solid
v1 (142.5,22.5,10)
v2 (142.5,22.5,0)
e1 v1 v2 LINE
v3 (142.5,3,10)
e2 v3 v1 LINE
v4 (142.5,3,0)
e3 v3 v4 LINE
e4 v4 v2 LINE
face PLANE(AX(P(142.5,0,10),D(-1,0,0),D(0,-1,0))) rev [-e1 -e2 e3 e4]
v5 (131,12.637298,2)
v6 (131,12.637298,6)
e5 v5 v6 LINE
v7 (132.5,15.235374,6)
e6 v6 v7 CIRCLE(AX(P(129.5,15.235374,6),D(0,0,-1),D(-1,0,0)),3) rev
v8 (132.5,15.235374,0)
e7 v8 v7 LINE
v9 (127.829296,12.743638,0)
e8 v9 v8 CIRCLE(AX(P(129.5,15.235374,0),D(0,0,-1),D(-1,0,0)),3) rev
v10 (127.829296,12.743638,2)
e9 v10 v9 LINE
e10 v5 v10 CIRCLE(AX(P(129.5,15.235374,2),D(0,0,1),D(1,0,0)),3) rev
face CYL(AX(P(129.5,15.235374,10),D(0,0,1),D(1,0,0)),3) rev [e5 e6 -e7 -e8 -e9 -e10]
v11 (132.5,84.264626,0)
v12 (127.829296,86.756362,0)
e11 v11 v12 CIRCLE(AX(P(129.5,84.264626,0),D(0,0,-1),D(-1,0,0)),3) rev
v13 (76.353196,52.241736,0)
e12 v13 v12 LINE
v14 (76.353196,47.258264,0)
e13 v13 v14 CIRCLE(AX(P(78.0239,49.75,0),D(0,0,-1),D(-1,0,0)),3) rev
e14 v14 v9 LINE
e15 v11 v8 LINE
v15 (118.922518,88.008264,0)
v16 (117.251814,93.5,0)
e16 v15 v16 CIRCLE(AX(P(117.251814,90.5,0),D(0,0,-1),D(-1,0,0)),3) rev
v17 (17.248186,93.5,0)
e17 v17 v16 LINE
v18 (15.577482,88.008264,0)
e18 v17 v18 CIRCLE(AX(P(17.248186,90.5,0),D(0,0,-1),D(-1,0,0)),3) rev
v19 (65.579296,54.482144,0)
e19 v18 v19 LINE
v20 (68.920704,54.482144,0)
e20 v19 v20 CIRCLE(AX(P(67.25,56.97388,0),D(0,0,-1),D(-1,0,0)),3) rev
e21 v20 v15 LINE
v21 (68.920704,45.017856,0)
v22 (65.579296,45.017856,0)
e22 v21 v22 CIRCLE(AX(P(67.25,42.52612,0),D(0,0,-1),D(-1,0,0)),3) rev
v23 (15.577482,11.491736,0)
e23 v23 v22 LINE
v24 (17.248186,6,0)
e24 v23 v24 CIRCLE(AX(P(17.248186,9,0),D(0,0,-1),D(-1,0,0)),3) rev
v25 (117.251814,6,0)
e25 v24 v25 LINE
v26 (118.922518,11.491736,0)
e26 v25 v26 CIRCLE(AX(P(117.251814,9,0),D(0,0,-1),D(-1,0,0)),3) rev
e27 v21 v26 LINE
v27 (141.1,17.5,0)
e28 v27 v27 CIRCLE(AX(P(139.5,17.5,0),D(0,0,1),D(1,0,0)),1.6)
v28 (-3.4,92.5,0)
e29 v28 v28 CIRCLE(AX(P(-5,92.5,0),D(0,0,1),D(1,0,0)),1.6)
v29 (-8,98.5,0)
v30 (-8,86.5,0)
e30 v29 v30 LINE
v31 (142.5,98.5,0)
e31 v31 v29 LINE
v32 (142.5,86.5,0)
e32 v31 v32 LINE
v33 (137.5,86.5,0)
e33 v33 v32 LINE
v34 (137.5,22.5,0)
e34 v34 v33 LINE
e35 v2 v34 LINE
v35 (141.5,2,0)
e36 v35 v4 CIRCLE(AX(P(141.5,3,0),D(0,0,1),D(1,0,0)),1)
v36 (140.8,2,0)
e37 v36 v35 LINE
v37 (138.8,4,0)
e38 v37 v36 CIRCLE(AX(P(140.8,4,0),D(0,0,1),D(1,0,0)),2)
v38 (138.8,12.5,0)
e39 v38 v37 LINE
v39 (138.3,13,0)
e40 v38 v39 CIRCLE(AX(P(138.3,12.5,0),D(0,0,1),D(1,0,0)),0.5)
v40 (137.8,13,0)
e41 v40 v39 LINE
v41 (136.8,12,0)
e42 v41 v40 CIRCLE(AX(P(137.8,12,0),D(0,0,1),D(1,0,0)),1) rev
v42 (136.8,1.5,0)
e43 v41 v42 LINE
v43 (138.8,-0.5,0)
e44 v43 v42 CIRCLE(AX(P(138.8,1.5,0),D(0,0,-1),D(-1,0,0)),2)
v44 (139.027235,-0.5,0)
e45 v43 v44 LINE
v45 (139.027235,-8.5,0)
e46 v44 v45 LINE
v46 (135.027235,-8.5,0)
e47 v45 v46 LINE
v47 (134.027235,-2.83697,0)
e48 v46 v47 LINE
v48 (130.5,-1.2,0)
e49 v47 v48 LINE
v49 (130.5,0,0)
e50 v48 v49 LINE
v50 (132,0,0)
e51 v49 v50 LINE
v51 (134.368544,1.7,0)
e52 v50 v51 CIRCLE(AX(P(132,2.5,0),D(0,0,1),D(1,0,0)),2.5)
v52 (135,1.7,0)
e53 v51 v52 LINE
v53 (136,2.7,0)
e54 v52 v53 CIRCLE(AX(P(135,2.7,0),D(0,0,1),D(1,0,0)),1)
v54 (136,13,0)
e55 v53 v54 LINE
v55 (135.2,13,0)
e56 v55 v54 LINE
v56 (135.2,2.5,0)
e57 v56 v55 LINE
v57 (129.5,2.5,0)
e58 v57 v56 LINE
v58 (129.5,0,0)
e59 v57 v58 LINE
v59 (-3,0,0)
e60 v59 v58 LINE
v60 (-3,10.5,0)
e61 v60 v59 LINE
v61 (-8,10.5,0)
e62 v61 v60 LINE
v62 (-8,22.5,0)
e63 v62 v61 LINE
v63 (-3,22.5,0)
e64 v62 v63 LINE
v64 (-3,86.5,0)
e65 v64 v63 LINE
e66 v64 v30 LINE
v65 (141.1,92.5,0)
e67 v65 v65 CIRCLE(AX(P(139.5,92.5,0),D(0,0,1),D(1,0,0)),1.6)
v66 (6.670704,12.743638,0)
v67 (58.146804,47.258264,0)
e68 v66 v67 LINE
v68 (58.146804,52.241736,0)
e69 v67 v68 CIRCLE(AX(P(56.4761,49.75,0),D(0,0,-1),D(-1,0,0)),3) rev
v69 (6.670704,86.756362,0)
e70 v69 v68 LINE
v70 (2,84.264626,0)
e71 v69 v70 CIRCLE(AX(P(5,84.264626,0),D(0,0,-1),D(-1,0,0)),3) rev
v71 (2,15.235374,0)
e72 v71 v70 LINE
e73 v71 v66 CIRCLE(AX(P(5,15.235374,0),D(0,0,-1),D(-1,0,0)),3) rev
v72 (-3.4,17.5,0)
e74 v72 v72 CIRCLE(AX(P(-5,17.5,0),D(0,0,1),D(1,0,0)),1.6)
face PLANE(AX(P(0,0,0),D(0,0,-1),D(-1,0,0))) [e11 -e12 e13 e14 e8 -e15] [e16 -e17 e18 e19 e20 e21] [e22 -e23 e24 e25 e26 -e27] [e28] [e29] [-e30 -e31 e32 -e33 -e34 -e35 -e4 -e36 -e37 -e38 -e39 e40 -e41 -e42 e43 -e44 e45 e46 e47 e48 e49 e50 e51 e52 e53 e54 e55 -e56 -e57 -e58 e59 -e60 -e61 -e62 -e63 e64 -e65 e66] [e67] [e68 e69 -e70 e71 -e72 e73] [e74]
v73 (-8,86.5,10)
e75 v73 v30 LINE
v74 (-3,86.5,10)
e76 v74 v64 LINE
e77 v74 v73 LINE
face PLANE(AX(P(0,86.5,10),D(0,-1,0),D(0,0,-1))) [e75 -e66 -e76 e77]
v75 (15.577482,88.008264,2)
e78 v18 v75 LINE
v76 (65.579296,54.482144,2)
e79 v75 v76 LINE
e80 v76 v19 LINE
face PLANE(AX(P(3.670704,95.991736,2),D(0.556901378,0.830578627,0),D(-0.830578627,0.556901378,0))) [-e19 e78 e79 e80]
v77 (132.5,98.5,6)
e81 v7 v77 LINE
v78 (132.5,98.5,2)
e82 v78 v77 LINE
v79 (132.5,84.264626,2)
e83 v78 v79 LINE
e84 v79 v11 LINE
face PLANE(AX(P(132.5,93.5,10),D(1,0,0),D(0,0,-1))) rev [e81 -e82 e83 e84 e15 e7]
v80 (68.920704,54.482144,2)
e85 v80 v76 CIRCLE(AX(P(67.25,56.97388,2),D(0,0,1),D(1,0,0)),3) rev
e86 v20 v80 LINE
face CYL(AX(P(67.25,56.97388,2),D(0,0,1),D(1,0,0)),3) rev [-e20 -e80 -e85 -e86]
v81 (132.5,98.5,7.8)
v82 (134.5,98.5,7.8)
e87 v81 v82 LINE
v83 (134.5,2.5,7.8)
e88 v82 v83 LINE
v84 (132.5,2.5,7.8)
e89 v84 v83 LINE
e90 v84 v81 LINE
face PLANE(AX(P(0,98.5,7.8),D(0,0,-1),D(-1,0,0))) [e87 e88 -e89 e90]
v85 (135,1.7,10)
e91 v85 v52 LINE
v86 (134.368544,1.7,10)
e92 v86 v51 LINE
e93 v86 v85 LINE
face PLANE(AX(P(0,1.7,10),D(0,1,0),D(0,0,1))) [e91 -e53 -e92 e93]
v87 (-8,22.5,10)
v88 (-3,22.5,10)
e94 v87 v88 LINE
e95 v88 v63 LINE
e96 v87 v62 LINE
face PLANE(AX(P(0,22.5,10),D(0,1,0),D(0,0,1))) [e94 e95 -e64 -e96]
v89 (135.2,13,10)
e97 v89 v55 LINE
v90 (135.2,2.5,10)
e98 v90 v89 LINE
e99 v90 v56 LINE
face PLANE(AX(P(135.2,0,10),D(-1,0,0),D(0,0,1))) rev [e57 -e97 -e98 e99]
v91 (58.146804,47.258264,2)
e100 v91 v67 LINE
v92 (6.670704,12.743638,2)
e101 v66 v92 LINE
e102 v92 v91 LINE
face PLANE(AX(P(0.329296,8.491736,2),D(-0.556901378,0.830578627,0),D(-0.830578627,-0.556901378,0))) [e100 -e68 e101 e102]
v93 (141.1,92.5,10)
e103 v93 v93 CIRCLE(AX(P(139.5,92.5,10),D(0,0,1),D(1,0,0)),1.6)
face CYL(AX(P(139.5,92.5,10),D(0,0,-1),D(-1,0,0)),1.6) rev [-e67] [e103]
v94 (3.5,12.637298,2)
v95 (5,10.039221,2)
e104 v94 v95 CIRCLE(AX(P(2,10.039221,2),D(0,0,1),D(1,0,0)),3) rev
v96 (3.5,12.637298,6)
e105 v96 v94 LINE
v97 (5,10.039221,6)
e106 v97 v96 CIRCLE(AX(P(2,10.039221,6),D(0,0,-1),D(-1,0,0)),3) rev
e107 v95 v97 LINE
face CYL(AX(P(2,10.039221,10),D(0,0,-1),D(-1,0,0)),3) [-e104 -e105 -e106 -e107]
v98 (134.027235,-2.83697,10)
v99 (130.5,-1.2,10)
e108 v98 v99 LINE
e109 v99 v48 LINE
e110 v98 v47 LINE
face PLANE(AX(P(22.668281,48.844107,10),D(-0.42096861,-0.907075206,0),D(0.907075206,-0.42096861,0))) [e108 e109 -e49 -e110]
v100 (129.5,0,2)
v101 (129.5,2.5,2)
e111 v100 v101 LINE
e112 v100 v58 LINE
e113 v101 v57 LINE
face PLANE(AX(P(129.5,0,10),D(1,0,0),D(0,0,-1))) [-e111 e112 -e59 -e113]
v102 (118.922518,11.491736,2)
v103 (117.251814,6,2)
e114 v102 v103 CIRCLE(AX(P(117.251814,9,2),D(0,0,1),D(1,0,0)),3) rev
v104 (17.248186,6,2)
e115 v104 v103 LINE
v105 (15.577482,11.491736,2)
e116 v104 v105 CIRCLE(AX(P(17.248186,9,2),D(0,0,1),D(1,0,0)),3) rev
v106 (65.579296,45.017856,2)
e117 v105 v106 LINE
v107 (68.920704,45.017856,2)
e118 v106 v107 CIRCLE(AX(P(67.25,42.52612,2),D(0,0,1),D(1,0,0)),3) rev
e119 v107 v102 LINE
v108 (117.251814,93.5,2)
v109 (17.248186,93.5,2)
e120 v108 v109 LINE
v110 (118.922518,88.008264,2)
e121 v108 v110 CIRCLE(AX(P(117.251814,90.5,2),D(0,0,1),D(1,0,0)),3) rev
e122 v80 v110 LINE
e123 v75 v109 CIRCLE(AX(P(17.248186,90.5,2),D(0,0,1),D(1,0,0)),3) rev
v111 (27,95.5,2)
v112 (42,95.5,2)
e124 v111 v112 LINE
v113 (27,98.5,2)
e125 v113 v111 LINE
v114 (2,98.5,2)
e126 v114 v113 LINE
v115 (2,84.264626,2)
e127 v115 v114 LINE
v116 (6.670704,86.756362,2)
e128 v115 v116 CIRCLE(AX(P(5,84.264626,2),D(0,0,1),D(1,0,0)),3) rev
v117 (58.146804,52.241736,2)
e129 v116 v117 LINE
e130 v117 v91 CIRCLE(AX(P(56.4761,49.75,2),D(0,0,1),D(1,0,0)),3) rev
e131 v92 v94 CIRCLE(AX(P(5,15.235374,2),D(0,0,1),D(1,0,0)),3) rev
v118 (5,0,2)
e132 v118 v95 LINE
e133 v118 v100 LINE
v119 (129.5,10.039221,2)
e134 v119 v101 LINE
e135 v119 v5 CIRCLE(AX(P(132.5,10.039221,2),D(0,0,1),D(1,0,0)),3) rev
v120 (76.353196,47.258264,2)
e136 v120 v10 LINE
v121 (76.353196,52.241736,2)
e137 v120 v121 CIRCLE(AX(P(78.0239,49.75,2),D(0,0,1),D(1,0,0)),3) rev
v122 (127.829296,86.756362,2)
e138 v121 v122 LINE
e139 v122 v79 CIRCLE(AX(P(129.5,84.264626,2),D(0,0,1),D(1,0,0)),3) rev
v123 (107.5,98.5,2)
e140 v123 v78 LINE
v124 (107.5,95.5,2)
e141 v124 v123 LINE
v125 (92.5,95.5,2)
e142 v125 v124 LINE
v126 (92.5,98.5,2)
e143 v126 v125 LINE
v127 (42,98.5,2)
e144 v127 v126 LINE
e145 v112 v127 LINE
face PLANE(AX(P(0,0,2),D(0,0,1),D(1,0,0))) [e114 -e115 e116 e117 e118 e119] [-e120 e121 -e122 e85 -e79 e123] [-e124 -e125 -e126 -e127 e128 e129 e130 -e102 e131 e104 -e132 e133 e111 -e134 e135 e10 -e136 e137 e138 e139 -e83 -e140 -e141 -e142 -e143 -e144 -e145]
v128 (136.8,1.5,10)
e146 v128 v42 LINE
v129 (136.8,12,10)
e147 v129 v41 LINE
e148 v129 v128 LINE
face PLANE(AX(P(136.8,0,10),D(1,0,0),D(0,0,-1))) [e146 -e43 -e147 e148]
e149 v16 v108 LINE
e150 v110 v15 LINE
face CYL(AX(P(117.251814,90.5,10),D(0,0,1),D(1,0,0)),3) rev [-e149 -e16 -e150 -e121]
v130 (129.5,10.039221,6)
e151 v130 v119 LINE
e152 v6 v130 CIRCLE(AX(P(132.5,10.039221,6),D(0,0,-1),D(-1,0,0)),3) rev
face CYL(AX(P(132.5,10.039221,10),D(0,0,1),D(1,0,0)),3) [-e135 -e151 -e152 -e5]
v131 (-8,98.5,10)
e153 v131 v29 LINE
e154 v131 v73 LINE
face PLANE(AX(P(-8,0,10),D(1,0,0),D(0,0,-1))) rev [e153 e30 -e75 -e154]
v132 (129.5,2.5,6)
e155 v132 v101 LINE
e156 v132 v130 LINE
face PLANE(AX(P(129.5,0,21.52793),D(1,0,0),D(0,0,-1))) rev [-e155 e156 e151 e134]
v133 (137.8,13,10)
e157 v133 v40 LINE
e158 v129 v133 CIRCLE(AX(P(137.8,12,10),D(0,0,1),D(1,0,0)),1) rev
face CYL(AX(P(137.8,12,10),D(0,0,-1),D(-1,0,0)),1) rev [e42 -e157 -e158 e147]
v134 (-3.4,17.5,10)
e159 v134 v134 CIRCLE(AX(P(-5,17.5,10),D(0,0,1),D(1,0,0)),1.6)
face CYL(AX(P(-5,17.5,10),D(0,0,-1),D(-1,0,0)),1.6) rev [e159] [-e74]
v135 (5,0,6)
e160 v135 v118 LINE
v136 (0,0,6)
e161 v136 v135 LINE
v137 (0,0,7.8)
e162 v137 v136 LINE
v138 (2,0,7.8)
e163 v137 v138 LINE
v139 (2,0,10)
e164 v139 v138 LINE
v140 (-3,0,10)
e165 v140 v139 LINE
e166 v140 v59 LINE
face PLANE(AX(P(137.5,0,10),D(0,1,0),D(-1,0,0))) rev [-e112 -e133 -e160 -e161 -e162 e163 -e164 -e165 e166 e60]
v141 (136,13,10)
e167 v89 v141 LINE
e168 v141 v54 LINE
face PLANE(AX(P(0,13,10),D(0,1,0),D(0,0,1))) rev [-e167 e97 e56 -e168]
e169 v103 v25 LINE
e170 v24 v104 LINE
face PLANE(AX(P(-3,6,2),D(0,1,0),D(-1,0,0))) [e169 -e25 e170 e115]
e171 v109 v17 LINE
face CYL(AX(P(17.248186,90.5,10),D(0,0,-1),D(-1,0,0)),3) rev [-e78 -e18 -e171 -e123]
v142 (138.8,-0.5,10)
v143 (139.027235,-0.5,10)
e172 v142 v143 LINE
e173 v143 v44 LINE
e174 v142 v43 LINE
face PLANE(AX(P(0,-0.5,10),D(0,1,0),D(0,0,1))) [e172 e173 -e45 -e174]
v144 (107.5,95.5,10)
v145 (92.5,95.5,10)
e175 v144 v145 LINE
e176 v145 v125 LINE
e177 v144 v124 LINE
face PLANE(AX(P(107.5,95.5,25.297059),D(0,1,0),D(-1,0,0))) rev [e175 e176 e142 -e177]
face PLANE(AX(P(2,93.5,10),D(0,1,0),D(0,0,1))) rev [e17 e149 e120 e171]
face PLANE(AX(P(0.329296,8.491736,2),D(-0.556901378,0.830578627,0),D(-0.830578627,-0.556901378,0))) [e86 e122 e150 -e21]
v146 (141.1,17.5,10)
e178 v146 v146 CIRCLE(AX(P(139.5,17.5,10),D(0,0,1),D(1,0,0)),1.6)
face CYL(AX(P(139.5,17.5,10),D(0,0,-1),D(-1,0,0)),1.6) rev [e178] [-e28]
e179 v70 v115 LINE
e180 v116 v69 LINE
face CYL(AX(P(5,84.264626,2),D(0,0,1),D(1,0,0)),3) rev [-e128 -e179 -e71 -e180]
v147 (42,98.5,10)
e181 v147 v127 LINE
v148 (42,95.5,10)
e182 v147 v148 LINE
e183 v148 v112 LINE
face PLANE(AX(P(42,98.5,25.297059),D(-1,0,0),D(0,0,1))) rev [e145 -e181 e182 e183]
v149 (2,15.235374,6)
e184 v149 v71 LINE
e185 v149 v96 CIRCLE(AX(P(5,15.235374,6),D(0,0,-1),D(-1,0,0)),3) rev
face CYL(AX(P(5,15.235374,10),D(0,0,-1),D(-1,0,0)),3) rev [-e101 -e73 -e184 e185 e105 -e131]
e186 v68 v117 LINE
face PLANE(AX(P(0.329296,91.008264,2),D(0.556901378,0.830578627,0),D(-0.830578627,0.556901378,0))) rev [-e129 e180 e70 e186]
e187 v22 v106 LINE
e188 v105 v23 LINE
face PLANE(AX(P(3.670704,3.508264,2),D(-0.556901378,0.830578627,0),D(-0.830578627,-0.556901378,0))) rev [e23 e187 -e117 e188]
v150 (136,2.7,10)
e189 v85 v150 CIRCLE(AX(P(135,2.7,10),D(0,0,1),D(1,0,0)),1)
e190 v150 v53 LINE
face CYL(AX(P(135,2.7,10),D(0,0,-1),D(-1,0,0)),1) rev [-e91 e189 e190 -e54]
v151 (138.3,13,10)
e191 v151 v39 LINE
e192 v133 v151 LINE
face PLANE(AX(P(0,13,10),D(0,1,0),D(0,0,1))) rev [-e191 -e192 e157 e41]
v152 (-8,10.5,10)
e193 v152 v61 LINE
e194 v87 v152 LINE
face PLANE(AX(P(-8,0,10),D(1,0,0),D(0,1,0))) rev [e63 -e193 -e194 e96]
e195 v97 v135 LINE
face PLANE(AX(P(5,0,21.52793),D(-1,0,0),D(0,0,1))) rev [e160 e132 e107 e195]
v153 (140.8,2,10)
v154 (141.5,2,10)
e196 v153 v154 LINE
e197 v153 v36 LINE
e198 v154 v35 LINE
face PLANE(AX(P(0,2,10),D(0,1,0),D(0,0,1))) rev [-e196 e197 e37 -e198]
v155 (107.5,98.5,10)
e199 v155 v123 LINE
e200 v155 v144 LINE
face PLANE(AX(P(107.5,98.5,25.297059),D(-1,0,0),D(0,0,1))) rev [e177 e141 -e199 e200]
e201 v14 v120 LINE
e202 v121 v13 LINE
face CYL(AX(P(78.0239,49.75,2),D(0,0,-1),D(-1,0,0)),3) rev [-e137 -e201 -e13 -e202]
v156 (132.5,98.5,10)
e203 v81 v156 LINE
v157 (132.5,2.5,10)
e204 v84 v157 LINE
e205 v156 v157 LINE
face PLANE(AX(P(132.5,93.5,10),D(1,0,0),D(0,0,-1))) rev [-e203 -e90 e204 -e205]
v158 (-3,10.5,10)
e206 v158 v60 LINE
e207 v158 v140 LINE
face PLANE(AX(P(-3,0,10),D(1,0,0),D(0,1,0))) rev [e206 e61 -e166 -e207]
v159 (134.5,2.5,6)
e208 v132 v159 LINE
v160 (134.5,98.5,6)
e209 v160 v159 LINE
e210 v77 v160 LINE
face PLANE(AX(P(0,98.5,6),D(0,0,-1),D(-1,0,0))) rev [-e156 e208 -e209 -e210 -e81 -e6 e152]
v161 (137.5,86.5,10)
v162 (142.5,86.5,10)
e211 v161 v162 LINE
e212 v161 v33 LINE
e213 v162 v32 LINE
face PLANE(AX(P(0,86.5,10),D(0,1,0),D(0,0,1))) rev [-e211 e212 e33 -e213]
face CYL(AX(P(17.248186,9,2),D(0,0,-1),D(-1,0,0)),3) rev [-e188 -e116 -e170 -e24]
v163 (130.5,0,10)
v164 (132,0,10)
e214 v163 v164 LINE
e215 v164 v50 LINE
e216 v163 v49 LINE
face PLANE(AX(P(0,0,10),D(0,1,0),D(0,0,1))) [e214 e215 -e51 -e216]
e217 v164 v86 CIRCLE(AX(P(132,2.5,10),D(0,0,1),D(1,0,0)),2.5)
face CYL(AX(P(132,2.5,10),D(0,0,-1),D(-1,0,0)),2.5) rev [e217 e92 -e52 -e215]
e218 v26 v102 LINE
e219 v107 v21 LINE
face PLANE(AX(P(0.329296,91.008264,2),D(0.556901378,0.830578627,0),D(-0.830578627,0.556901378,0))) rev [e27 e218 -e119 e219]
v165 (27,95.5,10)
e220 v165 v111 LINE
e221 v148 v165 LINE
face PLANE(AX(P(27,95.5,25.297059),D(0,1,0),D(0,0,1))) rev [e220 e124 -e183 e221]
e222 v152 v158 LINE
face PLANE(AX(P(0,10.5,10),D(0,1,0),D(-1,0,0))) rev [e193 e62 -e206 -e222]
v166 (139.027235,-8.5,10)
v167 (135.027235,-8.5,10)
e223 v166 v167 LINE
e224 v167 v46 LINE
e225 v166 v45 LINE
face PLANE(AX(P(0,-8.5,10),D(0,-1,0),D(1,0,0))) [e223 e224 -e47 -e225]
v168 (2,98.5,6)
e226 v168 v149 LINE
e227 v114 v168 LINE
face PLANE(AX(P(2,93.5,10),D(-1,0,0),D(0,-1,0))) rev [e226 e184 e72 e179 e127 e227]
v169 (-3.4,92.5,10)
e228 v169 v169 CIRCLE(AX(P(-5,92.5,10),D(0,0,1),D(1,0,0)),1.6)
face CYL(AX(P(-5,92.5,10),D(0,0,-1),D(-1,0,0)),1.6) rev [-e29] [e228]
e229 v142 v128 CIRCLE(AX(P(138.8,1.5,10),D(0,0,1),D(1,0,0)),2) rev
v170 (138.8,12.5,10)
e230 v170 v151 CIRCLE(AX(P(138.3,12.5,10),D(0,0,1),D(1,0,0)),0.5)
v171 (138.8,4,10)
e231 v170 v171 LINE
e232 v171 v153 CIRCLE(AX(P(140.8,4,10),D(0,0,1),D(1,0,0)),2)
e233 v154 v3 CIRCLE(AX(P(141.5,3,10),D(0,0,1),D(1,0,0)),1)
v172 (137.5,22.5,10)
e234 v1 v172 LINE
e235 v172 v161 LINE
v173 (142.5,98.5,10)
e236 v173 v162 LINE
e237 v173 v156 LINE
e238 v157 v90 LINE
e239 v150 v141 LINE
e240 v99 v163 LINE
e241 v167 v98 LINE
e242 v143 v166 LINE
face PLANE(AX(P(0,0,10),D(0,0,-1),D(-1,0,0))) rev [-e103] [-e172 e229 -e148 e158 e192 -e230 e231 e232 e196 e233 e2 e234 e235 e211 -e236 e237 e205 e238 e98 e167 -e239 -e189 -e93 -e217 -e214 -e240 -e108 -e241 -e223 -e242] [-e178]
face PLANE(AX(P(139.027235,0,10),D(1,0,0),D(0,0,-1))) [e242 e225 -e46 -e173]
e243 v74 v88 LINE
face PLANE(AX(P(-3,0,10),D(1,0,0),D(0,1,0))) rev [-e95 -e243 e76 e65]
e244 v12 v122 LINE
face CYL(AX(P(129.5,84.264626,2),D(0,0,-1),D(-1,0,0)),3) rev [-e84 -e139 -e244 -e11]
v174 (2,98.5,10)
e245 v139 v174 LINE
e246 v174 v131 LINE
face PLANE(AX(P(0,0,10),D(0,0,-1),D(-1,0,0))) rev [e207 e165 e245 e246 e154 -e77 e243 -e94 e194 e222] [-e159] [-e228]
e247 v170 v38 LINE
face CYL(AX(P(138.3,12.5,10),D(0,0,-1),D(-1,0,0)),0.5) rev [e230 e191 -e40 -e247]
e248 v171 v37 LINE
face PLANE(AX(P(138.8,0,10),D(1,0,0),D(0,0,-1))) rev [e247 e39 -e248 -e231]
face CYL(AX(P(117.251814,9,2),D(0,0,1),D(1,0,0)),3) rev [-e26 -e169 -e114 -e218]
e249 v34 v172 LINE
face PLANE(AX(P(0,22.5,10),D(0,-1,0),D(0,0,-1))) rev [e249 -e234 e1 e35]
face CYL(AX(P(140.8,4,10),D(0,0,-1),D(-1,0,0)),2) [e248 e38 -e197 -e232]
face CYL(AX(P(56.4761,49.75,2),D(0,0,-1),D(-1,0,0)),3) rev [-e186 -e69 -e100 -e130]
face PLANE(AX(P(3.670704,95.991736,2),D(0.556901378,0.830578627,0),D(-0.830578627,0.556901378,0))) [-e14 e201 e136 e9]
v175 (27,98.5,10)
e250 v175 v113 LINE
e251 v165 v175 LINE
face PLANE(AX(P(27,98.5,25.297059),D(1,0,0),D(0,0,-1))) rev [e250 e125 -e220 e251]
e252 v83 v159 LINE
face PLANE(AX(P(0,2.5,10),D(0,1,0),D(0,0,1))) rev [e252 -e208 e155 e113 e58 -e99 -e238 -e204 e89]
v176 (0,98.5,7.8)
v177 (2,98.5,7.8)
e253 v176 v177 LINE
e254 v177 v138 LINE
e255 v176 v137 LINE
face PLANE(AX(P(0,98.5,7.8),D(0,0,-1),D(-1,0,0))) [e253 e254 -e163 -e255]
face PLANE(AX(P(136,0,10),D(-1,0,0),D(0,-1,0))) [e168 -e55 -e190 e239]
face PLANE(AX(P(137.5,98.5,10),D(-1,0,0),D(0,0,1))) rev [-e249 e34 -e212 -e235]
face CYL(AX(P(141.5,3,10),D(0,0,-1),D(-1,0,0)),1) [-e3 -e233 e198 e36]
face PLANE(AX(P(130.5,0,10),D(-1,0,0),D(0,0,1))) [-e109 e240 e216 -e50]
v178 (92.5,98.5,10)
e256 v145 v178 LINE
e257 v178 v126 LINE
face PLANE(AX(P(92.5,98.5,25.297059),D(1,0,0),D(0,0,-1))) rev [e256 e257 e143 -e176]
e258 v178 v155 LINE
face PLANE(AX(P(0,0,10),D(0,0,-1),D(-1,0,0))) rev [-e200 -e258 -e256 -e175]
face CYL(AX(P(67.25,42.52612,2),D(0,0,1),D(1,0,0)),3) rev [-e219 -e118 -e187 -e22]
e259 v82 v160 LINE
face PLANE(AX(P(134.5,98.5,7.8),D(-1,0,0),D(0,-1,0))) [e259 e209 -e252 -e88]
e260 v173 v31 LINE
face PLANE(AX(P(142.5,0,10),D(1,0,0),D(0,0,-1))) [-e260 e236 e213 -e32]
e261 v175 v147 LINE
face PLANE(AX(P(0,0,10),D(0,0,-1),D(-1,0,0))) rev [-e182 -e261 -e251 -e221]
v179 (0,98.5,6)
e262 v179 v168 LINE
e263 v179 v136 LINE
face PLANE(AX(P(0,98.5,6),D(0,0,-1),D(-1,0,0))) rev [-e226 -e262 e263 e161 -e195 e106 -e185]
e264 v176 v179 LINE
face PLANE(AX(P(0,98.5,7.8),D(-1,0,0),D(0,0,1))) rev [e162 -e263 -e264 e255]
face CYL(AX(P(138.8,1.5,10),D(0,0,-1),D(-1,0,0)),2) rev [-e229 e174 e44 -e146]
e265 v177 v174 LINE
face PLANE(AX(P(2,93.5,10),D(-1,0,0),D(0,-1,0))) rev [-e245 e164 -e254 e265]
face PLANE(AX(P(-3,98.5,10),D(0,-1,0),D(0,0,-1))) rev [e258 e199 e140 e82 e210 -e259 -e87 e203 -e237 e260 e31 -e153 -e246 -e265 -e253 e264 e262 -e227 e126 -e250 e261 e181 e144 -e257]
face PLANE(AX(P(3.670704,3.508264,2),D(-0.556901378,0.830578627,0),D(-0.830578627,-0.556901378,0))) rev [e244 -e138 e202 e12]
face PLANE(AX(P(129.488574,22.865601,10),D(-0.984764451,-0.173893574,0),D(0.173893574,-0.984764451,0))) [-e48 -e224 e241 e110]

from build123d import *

# Parameters (mm, degrees)
BOSS_EXTRUDE1_DEPTH     = 10
SKETCH3_W               = 134.5
SKETCH3_H               = 1.8
CUT_EXTRUDE1_DEPTH      = 170.435828561
SKETCH5_W               = 140.5
SKETCH5_H               = 6
BOSS_EXTRUDE3_DEPTH     = 2
CUT_EXTRUDE2_DEPTH      = 170.435828561
FILLET1_R               = 3
BOSS_EXTRUDE2_OUTLINE_W = 5
BOSS_EXTRUDE2_OUTLINE_H = 12
BOSS_EXTRUDE2_OUTLINE_R = 1.6
BOSS_EXTRUDE2_DEPTH     = 10
SKETCH7_W               = 130.5
SKETCH7_H               = 5
CUT_EXTRUDE3_DEPTH      = 8
SKETCH8_W               = 15
SKETCH8_H               = 3
BOSS_EXTRUDE4_DEPTH     = 8
BOSS_EXTRUDE5_DEPTH     = 4
FILLET2_R               = 3


# Read off the part's stored shape, not the designer's step: Boss-Extrude2
with BuildPart() as part:
    # Sketch2 → Boss-Extrude1 (new body)
    with BuildSketch(Plane.XY):
        Polygon((2, 0), (-3, 0), (-3, 98.5), (137.5, 98.5), (137.5, 0), (132.5, 0), (132.5, 93.5), (2, 93.5), align=None)
    extrude(amount=BOSS_EXTRUDE1_DEPTH)

    # Sketch3 → Cut-Extrude1 (cut, through all)
    with BuildSketch(Plane.XZ):
        with Locations((67.25, 6.9)):
            Rectangle(SKETCH3_W, SKETCH3_H)
    extrude(amount=-CUT_EXTRUDE1_DEPTH, mode=Mode.SUBTRACT)

    # Sketch5 → Boss-Extrude3 (add)
    with BuildSketch(Plane(origin=(0, 0, 0), x_dir=(-1, 0, 0), z_dir=(0, 0, -1))):
        with Locations((-67.25, 3)):
            Rectangle(SKETCH5_W, SKETCH5_H)
        Polygon((-0.329295866, 8.49173588), (-130.829295866, 95.99173588), (-134.170704134, 91.00826412), (-3.670704134, 3.50826412), align=None)
        Polygon((-3.670704134, 95.99173588), (-134.170704134, 8.49173588), (-130.829295866, 3.50826412), (-0.329295866, 91.00826412), align=None)
    extrude(amount=-BOSS_EXTRUDE3_DEPTH)

    # Sketch4 → Cut-Extrude2 (cut, through all)
    with BuildSketch(Plane.XY):
        with BuildLine():
            ThreePointArc((132, 0), (133.457737974, 0.468990399), (134.368543856, 1.7))
            Line((134.368543856, 1.7), (135, 1.7))
            ThreePointArc((135, 1.7), (135.707106781, 1.992893219), (136, 2.7))
            Line((136, 2.7), (136, 13))
            Line((136, 13), (135.2, 13))
            Line((135.2, 13), (135.2, 2.5))
            Line((135.2, 2.5), (129.5, 2.5))
            Line((129.5, 2.5), (129.5, 0))
            Line((129.5, 0), (130.5, 0))
            Line((130.5, 0), (132, 0))
        make_face()
        with BuildLine():
            ThreePointArc((141.5, 2), (142.207106781, 2.292893219), (142.5, 3))
            Line((142.5, 3), (142.5, -0.5))
            Line((142.5, -0.5), (139.0272352, -0.5))
            Line((139.0272352, -0.5), (138.8, -0.5))
            ThreePointArc((138.8, -0.5), (137.385786438, 0.085786438), (136.8, 1.5))
            Line((136.8, 1.5), (136.8, 12))
            ThreePointArc((136.8, 12), (137.092893219, 12.707106781), (137.8, 13))
            Line((137.8, 13), (138.3, 13))
            ThreePointArc((138.3, 13), (138.653553391, 12.853553391), (138.8, 12.5))
            Line((138.8, 12.5), (138.8, 4))
            ThreePointArc((138.8, 4), (139.385786438, 2.585786438), (140.8, 2))
            Line((140.8, 2), (141.5, 2))
        make_face()
    extrude(amount=CUT_EXTRUDE2_DEPTH, mode=Mode.SUBTRACT)

    # Fillet1
    fillet1_edges = [part.edges().sort_by_distance(p)[0] for p in [
        (132.5, 89.888060199, 1),
        (72.636950218, 49.75, 1),
        (61.863049782, 49.75, 1),
        (67.25, 53.361939801, 1),
        (2, 89.888060199, 1),
        (127.113049782, 93.5, 1),
        (7.386950218, 6, 1),
        (2, 9.611939801, 1),
        (132.5, 9.611939801, 1),
        (67.25, 46.138060199, 1),
        (127.113049782, 6, 1),
        (7.386950218, 93.5, 1),
    ]]
    fillet(fillet1_edges, radius=FILLET1_R)

    # Boss-Extrude2 outline → Boss-Extrude2 (add)
    # profile 1 of 5: a face of its own
    with BuildSketch(Plane.XY):
        with BuildLine():
            Line((134.5, 1.7), (134.368543856, 1.7))
            ThreePointArc((134.368543856, 1.7), (133.457737974, 0.468990399), (132, 0))
            Line((132, 0), (130.5, 0))
            Line((130.5, 0), (130.5, -1.2))
            Line((130.5, -1.2), (134.0272352, -2.83697044))
            Line((134.0272352, -2.83697044), (135.0272352, -8.5))
            Line((135.0272352, -8.5), (139.0272352, -8.5))
            Line((139.0272352, -8.5), (139.0272352, -0.5))
            Line((139.0272352, -0.5), (138.8, -0.5))
            ThreePointArc((138.8, -0.5), (138.092893219, -0.370828693), (137.477124345, 1e-09))
            Line((137.477124345, 1e-09), (134.5, 0))
            Line((134.5, 0), (134.5, 1.7))
        make_face()
    # profile 2 of 5: a face of its own
    with BuildSketch(Plane.XY):
        with Locations((-5.5, 16.5)):
            Rectangle(BOSS_EXTRUDE2_OUTLINE_W, BOSS_EXTRUDE2_OUTLINE_H)
        with Locations((-5, 17.5)):
            Circle(BOSS_EXTRUDE2_OUTLINE_R, mode=Mode.SUBTRACT)
    # profile 3 of 5: a face of its own
    with BuildSketch(Plane.XY):
        with Locations((-5.5, 92.5)):
            Rectangle(BOSS_EXTRUDE2_OUTLINE_W, BOSS_EXTRUDE2_OUTLINE_H)
        with Locations((-5, 92.5)):
            Circle(BOSS_EXTRUDE2_OUTLINE_R, mode=Mode.SUBTRACT)
    # profile 4 of 5: a face of its own
    with BuildSketch(Plane.XY):
        with Locations((140, 92.5)):
            Rectangle(BOSS_EXTRUDE2_OUTLINE_W, BOSS_EXTRUDE2_OUTLINE_H)
        with Locations((139.5, 92.5)):
            Circle(BOSS_EXTRUDE2_OUTLINE_R, mode=Mode.SUBTRACT)
    # profile 5 of 5: a face of its own
    with BuildSketch(Plane.XY):
        with BuildLine():
            Line((137.8, 13), (138.3, 13))
            ThreePointArc((138.3, 13), (138.653553391, 12.853553391), (138.8, 12.5))
            Line((138.8, 12.5), (138.8, 4))
            ThreePointArc((138.8, 4), (139.385786438, 2.585786438), (140.8, 2))
            Line((140.8, 2), (141.5, 2))
            ThreePointArc((141.5, 2), (142.207106781, 2.292893219), (142.5, 3))
            Line((142.5, 3), (142.5, 22.5))
            Line((142.5, 22.5), (137.5, 22.5))
            Line((137.5, 22.5), (137.5, 12.953939201))
            ThreePointArc((137.5, 12.953939201), (137.648242301, 12.988417726), (137.8, 13))
        make_face()
        with Locations((139.5, 17.5)):
            Circle(BOSS_EXTRUDE2_OUTLINE_R, mode=Mode.SUBTRACT)
    extrude(amount=BOSS_EXTRUDE2_DEPTH)

    # Sketch7 → Cut-Extrude3 (cut)
    with BuildSketch(Plane.XY.offset(10)):
        with Locations((67.25, 96)):
            Rectangle(SKETCH7_W, SKETCH7_H)
    extrude(amount=-CUT_EXTRUDE3_DEPTH, mode=Mode.SUBTRACT)

    # Sketch8 → Boss-Extrude4 (add)
    with BuildSketch(Plane.XY.offset(2)):
        with Locations((34.5, 97)):
            Rectangle(SKETCH8_W, SKETCH8_H)
        with Locations((100, 97)):
            Rectangle(SKETCH8_W, SKETCH8_H)
    extrude(amount=BOSS_EXTRUDE4_DEPTH)

    # Sketch9 → Boss-Extrude5 (add)
    with BuildSketch(Plane.XY.offset(2)):
        with BuildLine():
            ThreePointArc((132.5, 15.235373856), (131.621320344, 13.114053512), (129.5, 12.235373856))
            Line((129.5, 12.235373856), (129.5, 2.5))
            Line((129.5, 2.5), (132.5, 2.5))
            Line((132.5, 2.5), (132.5, 15.235373856))
        make_face()
        with BuildLine():
            Line((2, 0), (5, 0))
            Line((5, 0), (5, 12.235373856))
            ThreePointArc((5, 12.235373856), (2.878679656, 13.114053512), (2, 15.235373856))
            Line((2, 15.235373856), (2, 0))
        make_face()
    extrude(amount=BOSS_EXTRUDE5_DEPTH)

    # Fillet2
    fillet2_edges = [part.edges().sort_by_distance(p)[0] for p in [
        (5, 12.235373856, 4),
        (129.5, 12.235373856, 4),
    ]]
    fillet(fillet2_edges, radius=FILLET2_R)


solid = part.part
